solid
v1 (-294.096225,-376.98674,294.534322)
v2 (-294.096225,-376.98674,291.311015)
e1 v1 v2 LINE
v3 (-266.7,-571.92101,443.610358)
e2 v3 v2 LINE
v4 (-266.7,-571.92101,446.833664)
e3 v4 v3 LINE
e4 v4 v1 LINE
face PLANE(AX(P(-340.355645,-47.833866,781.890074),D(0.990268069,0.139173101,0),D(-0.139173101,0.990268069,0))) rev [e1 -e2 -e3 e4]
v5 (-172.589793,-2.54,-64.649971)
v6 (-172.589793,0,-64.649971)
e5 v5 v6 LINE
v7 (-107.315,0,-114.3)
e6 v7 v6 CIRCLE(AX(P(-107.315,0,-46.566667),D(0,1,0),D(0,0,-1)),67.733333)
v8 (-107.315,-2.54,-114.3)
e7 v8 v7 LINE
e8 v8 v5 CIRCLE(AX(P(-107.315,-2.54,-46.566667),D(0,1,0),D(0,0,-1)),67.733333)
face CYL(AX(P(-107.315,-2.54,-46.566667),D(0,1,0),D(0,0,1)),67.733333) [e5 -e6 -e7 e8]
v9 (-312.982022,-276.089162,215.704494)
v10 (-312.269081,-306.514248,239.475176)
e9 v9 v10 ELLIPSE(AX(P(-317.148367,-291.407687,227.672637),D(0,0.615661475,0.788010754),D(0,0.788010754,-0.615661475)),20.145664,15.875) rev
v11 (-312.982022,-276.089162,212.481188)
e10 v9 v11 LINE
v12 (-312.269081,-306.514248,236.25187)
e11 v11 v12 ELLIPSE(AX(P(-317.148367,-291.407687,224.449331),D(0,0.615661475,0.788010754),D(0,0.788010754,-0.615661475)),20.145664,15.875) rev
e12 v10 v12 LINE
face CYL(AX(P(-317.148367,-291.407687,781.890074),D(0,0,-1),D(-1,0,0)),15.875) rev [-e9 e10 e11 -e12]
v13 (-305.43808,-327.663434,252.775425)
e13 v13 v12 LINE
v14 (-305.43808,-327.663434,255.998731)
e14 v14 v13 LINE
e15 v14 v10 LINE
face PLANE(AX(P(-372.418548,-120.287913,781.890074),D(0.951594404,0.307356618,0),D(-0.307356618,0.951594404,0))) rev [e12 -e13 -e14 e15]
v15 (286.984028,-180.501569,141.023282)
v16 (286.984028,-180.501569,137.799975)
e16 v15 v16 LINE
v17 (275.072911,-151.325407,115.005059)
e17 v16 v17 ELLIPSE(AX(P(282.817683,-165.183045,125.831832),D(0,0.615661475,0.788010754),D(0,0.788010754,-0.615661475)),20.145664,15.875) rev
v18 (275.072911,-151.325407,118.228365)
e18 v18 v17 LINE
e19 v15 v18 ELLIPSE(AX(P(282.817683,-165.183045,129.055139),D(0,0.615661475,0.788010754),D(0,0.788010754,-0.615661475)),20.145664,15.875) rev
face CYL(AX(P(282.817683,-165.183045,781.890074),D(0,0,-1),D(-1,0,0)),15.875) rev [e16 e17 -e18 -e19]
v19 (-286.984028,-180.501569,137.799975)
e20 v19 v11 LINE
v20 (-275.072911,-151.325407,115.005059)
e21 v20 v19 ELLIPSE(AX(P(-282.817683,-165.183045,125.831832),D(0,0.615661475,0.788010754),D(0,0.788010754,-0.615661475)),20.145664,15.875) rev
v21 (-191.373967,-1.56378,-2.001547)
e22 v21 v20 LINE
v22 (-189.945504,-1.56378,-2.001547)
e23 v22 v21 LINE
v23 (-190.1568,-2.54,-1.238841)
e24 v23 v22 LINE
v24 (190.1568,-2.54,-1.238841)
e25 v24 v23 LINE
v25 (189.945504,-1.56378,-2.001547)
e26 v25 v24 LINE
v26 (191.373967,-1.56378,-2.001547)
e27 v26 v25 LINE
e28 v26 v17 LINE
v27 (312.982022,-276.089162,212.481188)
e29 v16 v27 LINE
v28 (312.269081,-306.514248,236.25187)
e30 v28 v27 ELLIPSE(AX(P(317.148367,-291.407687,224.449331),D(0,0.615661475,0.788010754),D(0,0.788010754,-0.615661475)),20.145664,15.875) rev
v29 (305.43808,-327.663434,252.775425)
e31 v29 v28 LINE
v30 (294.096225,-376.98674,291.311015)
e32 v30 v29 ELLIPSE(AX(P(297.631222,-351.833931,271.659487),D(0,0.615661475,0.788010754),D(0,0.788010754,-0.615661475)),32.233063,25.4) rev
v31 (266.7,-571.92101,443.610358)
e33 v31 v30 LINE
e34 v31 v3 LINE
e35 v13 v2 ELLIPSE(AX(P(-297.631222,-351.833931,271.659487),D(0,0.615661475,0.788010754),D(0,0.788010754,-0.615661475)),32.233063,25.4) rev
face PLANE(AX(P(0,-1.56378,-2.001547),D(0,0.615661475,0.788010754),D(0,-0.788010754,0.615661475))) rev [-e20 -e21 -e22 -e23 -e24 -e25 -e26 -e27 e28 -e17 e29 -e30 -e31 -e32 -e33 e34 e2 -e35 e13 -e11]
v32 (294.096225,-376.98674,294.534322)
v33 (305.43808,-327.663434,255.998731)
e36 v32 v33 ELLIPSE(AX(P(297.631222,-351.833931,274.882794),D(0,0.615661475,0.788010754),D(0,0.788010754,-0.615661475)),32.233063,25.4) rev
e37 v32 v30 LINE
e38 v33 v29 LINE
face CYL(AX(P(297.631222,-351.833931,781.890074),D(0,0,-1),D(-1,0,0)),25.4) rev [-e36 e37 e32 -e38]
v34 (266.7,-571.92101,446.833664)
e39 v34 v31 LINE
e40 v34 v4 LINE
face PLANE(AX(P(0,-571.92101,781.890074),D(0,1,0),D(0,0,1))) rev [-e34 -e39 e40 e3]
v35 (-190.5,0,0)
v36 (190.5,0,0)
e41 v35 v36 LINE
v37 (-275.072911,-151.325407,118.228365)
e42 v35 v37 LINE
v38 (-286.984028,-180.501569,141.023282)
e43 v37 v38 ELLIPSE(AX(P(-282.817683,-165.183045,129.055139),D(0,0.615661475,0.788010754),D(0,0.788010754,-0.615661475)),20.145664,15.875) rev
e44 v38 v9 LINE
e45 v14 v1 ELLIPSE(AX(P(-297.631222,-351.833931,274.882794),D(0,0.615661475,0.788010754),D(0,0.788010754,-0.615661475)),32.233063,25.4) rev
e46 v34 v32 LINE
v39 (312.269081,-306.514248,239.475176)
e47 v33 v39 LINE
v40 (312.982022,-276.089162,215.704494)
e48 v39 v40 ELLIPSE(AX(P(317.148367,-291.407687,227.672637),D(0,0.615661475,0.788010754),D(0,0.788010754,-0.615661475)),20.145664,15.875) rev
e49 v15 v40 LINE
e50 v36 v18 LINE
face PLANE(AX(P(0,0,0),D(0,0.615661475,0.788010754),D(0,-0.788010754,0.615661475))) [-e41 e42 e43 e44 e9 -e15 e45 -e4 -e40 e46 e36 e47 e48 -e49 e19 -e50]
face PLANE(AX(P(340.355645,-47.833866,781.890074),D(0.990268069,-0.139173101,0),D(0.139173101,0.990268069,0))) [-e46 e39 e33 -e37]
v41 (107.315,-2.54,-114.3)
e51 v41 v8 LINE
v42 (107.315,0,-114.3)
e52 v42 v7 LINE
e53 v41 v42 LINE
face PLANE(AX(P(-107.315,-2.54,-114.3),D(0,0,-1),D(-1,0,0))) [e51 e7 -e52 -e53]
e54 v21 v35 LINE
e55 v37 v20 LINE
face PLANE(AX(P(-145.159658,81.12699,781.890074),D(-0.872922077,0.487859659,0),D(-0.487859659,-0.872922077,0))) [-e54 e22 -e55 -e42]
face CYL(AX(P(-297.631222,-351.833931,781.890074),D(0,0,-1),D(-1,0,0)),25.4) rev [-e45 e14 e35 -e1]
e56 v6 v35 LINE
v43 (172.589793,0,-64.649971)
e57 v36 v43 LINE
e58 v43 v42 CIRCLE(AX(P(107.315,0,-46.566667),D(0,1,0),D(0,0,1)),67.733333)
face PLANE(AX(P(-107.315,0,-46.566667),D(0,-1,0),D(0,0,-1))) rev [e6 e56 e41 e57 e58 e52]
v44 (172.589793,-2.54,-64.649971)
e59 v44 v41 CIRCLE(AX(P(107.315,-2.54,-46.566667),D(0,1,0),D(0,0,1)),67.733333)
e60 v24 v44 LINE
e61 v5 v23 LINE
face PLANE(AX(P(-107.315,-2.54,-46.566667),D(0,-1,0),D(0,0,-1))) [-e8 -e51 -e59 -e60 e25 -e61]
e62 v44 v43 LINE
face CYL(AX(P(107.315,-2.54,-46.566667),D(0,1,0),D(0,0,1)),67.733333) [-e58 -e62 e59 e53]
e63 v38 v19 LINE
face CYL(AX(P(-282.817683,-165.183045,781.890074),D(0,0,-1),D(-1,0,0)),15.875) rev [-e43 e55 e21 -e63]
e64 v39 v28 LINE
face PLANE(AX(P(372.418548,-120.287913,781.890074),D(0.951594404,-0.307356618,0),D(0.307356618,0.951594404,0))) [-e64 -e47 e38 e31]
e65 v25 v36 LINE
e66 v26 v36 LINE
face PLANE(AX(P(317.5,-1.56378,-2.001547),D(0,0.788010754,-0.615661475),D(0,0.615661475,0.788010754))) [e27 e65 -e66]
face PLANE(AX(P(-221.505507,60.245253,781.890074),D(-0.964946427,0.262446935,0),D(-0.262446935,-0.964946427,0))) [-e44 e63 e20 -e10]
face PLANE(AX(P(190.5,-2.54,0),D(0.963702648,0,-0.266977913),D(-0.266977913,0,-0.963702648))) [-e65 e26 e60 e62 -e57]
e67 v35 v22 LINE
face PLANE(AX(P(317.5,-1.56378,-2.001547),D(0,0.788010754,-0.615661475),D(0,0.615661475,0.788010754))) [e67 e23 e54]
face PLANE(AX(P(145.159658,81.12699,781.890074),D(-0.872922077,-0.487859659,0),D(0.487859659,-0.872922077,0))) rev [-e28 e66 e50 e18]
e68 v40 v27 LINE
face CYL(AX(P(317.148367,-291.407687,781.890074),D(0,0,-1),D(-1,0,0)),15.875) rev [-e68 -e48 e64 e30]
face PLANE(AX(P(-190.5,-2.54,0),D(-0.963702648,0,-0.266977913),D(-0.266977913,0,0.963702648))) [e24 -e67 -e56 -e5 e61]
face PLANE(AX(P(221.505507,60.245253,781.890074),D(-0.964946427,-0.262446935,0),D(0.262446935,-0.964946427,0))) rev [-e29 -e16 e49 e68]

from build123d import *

# Parameters (mm, degrees)
BOSS_EXTRUDE1_DEPTH     = 2.54
SKETCH3_W               = 635
SKETCH3_H               = 1270
BOSS_EXTRUDE2_DEPTH     = 2.54
CUT_EXTRUDE1_DEPTH      = 1311.281906829
CUT_EXTRUDE1_DEPTH_BACK = 1311.281906829


with BuildPart() as part:
    # Sketch2 → Boss-Extrude1 (new body)
    with BuildSketch(Plane(origin=(0, 0, 0), x_dir=(1, 0, 0), z_dir=(0, 1, 0))):
        with BuildLine():
            Line((-190.5, 0), (190.5, 0))
            Line((190.5, 0), (172.589792707, 64.649970609))
            ThreePointArc((172.589792707, 64.649970609), (148.320865378, 100.476994518), (107.315, 114.3))
            Line((107.315, 114.3), (-107.315, 114.3))
            ThreePointArc((-107.315, 114.3), (-148.320865378, 100.476994518), (-172.589792707, 64.649970609))
            Line((-172.589792707, 64.649970609), (-190.5, 0))
        make_face()
    extrude(amount=-BOSS_EXTRUDE1_DEPTH)

    # Sketch3 → Boss-Extrude2 (add)
    with BuildSketch(Plane(origin=(0, 0, 0), x_dir=(1, 0, 0), z_dir=(0, 0.6156614753256567, 0.7880107536067232))):
        with Locations((0, -635)):
            Rectangle(SKETCH3_W, SKETCH3_H)
    extrude(amount=-BOSS_EXTRUDE2_DEPTH)

    # Sketch4 → Cut-Extrude1 (cut, two sides: drawn at the far end of the back side and taken through both)
    with BuildSketch(Plane.XY.offset(-CUT_EXTRUDE1_DEPTH_BACK)):
        with BuildLine():
            Line((-275.07291121, -151.325406705), (-190.5, 0))
            Line((-190.5, 0), (-571.5, 0))
            Line((-571.5, 0), (-571.5, -1524))
            Line((-571.5, -1524), (571.5, -1524))
            Line((571.5, -1524), (571.5, 0))
            Line((571.5, 0), (190.5, 0))
            Line((190.5, 0), (275.07291121, -151.325406705))
            ThreePointArc((275.07291121, -151.325406705), (268.12028899, -171.183230141), (286.984028398, -180.501569203))
            Line((286.984028398, -180.501569203), (312.982021819, -276.089162217))
            ThreePointArc((312.982021819, -276.089162217), (301.277723529, -291.035795076), (312.269080611, -306.514247899))
            Line((312.269080611, -306.514247899), (305.43807978, -327.663433526))
            ThreePointArc((305.43807978, -327.663433526), (272.877245274, -346.141774353), (294.096224924, -376.98674033))
            Line((294.096224924, -376.98674033), (266.7, -571.921009662))
            Line((266.7, -571.921009662), (-266.7, -571.921009662))
            Line((-266.7, -571.921009662), (-294.096224924, -376.98674033))
            ThreePointArc((-294.096224924, -376.98674033), (-272.877245274, -346.141774353), (-305.43807978, -327.663433526))
            Line((-305.43807978, -327.663433526), (-312.269080611, -306.514247899))
            ThreePointArc((-312.269080611, -306.514247899), (-301.277723529, -291.035795076), (-312.982021819, -276.089162217))
            Line((-312.982021819, -276.089162217), (-286.984028398, -180.501569203))
            ThreePointArc((-286.984028398, -180.501569203), (-268.12028899, -171.183230141), (-275.07291121, -151.325406705))
        make_face()
    extrude(amount=CUT_EXTRUDE1_DEPTH + CUT_EXTRUDE1_DEPTH_BACK, mode=Mode.SUBTRACT)


solid = part.part
